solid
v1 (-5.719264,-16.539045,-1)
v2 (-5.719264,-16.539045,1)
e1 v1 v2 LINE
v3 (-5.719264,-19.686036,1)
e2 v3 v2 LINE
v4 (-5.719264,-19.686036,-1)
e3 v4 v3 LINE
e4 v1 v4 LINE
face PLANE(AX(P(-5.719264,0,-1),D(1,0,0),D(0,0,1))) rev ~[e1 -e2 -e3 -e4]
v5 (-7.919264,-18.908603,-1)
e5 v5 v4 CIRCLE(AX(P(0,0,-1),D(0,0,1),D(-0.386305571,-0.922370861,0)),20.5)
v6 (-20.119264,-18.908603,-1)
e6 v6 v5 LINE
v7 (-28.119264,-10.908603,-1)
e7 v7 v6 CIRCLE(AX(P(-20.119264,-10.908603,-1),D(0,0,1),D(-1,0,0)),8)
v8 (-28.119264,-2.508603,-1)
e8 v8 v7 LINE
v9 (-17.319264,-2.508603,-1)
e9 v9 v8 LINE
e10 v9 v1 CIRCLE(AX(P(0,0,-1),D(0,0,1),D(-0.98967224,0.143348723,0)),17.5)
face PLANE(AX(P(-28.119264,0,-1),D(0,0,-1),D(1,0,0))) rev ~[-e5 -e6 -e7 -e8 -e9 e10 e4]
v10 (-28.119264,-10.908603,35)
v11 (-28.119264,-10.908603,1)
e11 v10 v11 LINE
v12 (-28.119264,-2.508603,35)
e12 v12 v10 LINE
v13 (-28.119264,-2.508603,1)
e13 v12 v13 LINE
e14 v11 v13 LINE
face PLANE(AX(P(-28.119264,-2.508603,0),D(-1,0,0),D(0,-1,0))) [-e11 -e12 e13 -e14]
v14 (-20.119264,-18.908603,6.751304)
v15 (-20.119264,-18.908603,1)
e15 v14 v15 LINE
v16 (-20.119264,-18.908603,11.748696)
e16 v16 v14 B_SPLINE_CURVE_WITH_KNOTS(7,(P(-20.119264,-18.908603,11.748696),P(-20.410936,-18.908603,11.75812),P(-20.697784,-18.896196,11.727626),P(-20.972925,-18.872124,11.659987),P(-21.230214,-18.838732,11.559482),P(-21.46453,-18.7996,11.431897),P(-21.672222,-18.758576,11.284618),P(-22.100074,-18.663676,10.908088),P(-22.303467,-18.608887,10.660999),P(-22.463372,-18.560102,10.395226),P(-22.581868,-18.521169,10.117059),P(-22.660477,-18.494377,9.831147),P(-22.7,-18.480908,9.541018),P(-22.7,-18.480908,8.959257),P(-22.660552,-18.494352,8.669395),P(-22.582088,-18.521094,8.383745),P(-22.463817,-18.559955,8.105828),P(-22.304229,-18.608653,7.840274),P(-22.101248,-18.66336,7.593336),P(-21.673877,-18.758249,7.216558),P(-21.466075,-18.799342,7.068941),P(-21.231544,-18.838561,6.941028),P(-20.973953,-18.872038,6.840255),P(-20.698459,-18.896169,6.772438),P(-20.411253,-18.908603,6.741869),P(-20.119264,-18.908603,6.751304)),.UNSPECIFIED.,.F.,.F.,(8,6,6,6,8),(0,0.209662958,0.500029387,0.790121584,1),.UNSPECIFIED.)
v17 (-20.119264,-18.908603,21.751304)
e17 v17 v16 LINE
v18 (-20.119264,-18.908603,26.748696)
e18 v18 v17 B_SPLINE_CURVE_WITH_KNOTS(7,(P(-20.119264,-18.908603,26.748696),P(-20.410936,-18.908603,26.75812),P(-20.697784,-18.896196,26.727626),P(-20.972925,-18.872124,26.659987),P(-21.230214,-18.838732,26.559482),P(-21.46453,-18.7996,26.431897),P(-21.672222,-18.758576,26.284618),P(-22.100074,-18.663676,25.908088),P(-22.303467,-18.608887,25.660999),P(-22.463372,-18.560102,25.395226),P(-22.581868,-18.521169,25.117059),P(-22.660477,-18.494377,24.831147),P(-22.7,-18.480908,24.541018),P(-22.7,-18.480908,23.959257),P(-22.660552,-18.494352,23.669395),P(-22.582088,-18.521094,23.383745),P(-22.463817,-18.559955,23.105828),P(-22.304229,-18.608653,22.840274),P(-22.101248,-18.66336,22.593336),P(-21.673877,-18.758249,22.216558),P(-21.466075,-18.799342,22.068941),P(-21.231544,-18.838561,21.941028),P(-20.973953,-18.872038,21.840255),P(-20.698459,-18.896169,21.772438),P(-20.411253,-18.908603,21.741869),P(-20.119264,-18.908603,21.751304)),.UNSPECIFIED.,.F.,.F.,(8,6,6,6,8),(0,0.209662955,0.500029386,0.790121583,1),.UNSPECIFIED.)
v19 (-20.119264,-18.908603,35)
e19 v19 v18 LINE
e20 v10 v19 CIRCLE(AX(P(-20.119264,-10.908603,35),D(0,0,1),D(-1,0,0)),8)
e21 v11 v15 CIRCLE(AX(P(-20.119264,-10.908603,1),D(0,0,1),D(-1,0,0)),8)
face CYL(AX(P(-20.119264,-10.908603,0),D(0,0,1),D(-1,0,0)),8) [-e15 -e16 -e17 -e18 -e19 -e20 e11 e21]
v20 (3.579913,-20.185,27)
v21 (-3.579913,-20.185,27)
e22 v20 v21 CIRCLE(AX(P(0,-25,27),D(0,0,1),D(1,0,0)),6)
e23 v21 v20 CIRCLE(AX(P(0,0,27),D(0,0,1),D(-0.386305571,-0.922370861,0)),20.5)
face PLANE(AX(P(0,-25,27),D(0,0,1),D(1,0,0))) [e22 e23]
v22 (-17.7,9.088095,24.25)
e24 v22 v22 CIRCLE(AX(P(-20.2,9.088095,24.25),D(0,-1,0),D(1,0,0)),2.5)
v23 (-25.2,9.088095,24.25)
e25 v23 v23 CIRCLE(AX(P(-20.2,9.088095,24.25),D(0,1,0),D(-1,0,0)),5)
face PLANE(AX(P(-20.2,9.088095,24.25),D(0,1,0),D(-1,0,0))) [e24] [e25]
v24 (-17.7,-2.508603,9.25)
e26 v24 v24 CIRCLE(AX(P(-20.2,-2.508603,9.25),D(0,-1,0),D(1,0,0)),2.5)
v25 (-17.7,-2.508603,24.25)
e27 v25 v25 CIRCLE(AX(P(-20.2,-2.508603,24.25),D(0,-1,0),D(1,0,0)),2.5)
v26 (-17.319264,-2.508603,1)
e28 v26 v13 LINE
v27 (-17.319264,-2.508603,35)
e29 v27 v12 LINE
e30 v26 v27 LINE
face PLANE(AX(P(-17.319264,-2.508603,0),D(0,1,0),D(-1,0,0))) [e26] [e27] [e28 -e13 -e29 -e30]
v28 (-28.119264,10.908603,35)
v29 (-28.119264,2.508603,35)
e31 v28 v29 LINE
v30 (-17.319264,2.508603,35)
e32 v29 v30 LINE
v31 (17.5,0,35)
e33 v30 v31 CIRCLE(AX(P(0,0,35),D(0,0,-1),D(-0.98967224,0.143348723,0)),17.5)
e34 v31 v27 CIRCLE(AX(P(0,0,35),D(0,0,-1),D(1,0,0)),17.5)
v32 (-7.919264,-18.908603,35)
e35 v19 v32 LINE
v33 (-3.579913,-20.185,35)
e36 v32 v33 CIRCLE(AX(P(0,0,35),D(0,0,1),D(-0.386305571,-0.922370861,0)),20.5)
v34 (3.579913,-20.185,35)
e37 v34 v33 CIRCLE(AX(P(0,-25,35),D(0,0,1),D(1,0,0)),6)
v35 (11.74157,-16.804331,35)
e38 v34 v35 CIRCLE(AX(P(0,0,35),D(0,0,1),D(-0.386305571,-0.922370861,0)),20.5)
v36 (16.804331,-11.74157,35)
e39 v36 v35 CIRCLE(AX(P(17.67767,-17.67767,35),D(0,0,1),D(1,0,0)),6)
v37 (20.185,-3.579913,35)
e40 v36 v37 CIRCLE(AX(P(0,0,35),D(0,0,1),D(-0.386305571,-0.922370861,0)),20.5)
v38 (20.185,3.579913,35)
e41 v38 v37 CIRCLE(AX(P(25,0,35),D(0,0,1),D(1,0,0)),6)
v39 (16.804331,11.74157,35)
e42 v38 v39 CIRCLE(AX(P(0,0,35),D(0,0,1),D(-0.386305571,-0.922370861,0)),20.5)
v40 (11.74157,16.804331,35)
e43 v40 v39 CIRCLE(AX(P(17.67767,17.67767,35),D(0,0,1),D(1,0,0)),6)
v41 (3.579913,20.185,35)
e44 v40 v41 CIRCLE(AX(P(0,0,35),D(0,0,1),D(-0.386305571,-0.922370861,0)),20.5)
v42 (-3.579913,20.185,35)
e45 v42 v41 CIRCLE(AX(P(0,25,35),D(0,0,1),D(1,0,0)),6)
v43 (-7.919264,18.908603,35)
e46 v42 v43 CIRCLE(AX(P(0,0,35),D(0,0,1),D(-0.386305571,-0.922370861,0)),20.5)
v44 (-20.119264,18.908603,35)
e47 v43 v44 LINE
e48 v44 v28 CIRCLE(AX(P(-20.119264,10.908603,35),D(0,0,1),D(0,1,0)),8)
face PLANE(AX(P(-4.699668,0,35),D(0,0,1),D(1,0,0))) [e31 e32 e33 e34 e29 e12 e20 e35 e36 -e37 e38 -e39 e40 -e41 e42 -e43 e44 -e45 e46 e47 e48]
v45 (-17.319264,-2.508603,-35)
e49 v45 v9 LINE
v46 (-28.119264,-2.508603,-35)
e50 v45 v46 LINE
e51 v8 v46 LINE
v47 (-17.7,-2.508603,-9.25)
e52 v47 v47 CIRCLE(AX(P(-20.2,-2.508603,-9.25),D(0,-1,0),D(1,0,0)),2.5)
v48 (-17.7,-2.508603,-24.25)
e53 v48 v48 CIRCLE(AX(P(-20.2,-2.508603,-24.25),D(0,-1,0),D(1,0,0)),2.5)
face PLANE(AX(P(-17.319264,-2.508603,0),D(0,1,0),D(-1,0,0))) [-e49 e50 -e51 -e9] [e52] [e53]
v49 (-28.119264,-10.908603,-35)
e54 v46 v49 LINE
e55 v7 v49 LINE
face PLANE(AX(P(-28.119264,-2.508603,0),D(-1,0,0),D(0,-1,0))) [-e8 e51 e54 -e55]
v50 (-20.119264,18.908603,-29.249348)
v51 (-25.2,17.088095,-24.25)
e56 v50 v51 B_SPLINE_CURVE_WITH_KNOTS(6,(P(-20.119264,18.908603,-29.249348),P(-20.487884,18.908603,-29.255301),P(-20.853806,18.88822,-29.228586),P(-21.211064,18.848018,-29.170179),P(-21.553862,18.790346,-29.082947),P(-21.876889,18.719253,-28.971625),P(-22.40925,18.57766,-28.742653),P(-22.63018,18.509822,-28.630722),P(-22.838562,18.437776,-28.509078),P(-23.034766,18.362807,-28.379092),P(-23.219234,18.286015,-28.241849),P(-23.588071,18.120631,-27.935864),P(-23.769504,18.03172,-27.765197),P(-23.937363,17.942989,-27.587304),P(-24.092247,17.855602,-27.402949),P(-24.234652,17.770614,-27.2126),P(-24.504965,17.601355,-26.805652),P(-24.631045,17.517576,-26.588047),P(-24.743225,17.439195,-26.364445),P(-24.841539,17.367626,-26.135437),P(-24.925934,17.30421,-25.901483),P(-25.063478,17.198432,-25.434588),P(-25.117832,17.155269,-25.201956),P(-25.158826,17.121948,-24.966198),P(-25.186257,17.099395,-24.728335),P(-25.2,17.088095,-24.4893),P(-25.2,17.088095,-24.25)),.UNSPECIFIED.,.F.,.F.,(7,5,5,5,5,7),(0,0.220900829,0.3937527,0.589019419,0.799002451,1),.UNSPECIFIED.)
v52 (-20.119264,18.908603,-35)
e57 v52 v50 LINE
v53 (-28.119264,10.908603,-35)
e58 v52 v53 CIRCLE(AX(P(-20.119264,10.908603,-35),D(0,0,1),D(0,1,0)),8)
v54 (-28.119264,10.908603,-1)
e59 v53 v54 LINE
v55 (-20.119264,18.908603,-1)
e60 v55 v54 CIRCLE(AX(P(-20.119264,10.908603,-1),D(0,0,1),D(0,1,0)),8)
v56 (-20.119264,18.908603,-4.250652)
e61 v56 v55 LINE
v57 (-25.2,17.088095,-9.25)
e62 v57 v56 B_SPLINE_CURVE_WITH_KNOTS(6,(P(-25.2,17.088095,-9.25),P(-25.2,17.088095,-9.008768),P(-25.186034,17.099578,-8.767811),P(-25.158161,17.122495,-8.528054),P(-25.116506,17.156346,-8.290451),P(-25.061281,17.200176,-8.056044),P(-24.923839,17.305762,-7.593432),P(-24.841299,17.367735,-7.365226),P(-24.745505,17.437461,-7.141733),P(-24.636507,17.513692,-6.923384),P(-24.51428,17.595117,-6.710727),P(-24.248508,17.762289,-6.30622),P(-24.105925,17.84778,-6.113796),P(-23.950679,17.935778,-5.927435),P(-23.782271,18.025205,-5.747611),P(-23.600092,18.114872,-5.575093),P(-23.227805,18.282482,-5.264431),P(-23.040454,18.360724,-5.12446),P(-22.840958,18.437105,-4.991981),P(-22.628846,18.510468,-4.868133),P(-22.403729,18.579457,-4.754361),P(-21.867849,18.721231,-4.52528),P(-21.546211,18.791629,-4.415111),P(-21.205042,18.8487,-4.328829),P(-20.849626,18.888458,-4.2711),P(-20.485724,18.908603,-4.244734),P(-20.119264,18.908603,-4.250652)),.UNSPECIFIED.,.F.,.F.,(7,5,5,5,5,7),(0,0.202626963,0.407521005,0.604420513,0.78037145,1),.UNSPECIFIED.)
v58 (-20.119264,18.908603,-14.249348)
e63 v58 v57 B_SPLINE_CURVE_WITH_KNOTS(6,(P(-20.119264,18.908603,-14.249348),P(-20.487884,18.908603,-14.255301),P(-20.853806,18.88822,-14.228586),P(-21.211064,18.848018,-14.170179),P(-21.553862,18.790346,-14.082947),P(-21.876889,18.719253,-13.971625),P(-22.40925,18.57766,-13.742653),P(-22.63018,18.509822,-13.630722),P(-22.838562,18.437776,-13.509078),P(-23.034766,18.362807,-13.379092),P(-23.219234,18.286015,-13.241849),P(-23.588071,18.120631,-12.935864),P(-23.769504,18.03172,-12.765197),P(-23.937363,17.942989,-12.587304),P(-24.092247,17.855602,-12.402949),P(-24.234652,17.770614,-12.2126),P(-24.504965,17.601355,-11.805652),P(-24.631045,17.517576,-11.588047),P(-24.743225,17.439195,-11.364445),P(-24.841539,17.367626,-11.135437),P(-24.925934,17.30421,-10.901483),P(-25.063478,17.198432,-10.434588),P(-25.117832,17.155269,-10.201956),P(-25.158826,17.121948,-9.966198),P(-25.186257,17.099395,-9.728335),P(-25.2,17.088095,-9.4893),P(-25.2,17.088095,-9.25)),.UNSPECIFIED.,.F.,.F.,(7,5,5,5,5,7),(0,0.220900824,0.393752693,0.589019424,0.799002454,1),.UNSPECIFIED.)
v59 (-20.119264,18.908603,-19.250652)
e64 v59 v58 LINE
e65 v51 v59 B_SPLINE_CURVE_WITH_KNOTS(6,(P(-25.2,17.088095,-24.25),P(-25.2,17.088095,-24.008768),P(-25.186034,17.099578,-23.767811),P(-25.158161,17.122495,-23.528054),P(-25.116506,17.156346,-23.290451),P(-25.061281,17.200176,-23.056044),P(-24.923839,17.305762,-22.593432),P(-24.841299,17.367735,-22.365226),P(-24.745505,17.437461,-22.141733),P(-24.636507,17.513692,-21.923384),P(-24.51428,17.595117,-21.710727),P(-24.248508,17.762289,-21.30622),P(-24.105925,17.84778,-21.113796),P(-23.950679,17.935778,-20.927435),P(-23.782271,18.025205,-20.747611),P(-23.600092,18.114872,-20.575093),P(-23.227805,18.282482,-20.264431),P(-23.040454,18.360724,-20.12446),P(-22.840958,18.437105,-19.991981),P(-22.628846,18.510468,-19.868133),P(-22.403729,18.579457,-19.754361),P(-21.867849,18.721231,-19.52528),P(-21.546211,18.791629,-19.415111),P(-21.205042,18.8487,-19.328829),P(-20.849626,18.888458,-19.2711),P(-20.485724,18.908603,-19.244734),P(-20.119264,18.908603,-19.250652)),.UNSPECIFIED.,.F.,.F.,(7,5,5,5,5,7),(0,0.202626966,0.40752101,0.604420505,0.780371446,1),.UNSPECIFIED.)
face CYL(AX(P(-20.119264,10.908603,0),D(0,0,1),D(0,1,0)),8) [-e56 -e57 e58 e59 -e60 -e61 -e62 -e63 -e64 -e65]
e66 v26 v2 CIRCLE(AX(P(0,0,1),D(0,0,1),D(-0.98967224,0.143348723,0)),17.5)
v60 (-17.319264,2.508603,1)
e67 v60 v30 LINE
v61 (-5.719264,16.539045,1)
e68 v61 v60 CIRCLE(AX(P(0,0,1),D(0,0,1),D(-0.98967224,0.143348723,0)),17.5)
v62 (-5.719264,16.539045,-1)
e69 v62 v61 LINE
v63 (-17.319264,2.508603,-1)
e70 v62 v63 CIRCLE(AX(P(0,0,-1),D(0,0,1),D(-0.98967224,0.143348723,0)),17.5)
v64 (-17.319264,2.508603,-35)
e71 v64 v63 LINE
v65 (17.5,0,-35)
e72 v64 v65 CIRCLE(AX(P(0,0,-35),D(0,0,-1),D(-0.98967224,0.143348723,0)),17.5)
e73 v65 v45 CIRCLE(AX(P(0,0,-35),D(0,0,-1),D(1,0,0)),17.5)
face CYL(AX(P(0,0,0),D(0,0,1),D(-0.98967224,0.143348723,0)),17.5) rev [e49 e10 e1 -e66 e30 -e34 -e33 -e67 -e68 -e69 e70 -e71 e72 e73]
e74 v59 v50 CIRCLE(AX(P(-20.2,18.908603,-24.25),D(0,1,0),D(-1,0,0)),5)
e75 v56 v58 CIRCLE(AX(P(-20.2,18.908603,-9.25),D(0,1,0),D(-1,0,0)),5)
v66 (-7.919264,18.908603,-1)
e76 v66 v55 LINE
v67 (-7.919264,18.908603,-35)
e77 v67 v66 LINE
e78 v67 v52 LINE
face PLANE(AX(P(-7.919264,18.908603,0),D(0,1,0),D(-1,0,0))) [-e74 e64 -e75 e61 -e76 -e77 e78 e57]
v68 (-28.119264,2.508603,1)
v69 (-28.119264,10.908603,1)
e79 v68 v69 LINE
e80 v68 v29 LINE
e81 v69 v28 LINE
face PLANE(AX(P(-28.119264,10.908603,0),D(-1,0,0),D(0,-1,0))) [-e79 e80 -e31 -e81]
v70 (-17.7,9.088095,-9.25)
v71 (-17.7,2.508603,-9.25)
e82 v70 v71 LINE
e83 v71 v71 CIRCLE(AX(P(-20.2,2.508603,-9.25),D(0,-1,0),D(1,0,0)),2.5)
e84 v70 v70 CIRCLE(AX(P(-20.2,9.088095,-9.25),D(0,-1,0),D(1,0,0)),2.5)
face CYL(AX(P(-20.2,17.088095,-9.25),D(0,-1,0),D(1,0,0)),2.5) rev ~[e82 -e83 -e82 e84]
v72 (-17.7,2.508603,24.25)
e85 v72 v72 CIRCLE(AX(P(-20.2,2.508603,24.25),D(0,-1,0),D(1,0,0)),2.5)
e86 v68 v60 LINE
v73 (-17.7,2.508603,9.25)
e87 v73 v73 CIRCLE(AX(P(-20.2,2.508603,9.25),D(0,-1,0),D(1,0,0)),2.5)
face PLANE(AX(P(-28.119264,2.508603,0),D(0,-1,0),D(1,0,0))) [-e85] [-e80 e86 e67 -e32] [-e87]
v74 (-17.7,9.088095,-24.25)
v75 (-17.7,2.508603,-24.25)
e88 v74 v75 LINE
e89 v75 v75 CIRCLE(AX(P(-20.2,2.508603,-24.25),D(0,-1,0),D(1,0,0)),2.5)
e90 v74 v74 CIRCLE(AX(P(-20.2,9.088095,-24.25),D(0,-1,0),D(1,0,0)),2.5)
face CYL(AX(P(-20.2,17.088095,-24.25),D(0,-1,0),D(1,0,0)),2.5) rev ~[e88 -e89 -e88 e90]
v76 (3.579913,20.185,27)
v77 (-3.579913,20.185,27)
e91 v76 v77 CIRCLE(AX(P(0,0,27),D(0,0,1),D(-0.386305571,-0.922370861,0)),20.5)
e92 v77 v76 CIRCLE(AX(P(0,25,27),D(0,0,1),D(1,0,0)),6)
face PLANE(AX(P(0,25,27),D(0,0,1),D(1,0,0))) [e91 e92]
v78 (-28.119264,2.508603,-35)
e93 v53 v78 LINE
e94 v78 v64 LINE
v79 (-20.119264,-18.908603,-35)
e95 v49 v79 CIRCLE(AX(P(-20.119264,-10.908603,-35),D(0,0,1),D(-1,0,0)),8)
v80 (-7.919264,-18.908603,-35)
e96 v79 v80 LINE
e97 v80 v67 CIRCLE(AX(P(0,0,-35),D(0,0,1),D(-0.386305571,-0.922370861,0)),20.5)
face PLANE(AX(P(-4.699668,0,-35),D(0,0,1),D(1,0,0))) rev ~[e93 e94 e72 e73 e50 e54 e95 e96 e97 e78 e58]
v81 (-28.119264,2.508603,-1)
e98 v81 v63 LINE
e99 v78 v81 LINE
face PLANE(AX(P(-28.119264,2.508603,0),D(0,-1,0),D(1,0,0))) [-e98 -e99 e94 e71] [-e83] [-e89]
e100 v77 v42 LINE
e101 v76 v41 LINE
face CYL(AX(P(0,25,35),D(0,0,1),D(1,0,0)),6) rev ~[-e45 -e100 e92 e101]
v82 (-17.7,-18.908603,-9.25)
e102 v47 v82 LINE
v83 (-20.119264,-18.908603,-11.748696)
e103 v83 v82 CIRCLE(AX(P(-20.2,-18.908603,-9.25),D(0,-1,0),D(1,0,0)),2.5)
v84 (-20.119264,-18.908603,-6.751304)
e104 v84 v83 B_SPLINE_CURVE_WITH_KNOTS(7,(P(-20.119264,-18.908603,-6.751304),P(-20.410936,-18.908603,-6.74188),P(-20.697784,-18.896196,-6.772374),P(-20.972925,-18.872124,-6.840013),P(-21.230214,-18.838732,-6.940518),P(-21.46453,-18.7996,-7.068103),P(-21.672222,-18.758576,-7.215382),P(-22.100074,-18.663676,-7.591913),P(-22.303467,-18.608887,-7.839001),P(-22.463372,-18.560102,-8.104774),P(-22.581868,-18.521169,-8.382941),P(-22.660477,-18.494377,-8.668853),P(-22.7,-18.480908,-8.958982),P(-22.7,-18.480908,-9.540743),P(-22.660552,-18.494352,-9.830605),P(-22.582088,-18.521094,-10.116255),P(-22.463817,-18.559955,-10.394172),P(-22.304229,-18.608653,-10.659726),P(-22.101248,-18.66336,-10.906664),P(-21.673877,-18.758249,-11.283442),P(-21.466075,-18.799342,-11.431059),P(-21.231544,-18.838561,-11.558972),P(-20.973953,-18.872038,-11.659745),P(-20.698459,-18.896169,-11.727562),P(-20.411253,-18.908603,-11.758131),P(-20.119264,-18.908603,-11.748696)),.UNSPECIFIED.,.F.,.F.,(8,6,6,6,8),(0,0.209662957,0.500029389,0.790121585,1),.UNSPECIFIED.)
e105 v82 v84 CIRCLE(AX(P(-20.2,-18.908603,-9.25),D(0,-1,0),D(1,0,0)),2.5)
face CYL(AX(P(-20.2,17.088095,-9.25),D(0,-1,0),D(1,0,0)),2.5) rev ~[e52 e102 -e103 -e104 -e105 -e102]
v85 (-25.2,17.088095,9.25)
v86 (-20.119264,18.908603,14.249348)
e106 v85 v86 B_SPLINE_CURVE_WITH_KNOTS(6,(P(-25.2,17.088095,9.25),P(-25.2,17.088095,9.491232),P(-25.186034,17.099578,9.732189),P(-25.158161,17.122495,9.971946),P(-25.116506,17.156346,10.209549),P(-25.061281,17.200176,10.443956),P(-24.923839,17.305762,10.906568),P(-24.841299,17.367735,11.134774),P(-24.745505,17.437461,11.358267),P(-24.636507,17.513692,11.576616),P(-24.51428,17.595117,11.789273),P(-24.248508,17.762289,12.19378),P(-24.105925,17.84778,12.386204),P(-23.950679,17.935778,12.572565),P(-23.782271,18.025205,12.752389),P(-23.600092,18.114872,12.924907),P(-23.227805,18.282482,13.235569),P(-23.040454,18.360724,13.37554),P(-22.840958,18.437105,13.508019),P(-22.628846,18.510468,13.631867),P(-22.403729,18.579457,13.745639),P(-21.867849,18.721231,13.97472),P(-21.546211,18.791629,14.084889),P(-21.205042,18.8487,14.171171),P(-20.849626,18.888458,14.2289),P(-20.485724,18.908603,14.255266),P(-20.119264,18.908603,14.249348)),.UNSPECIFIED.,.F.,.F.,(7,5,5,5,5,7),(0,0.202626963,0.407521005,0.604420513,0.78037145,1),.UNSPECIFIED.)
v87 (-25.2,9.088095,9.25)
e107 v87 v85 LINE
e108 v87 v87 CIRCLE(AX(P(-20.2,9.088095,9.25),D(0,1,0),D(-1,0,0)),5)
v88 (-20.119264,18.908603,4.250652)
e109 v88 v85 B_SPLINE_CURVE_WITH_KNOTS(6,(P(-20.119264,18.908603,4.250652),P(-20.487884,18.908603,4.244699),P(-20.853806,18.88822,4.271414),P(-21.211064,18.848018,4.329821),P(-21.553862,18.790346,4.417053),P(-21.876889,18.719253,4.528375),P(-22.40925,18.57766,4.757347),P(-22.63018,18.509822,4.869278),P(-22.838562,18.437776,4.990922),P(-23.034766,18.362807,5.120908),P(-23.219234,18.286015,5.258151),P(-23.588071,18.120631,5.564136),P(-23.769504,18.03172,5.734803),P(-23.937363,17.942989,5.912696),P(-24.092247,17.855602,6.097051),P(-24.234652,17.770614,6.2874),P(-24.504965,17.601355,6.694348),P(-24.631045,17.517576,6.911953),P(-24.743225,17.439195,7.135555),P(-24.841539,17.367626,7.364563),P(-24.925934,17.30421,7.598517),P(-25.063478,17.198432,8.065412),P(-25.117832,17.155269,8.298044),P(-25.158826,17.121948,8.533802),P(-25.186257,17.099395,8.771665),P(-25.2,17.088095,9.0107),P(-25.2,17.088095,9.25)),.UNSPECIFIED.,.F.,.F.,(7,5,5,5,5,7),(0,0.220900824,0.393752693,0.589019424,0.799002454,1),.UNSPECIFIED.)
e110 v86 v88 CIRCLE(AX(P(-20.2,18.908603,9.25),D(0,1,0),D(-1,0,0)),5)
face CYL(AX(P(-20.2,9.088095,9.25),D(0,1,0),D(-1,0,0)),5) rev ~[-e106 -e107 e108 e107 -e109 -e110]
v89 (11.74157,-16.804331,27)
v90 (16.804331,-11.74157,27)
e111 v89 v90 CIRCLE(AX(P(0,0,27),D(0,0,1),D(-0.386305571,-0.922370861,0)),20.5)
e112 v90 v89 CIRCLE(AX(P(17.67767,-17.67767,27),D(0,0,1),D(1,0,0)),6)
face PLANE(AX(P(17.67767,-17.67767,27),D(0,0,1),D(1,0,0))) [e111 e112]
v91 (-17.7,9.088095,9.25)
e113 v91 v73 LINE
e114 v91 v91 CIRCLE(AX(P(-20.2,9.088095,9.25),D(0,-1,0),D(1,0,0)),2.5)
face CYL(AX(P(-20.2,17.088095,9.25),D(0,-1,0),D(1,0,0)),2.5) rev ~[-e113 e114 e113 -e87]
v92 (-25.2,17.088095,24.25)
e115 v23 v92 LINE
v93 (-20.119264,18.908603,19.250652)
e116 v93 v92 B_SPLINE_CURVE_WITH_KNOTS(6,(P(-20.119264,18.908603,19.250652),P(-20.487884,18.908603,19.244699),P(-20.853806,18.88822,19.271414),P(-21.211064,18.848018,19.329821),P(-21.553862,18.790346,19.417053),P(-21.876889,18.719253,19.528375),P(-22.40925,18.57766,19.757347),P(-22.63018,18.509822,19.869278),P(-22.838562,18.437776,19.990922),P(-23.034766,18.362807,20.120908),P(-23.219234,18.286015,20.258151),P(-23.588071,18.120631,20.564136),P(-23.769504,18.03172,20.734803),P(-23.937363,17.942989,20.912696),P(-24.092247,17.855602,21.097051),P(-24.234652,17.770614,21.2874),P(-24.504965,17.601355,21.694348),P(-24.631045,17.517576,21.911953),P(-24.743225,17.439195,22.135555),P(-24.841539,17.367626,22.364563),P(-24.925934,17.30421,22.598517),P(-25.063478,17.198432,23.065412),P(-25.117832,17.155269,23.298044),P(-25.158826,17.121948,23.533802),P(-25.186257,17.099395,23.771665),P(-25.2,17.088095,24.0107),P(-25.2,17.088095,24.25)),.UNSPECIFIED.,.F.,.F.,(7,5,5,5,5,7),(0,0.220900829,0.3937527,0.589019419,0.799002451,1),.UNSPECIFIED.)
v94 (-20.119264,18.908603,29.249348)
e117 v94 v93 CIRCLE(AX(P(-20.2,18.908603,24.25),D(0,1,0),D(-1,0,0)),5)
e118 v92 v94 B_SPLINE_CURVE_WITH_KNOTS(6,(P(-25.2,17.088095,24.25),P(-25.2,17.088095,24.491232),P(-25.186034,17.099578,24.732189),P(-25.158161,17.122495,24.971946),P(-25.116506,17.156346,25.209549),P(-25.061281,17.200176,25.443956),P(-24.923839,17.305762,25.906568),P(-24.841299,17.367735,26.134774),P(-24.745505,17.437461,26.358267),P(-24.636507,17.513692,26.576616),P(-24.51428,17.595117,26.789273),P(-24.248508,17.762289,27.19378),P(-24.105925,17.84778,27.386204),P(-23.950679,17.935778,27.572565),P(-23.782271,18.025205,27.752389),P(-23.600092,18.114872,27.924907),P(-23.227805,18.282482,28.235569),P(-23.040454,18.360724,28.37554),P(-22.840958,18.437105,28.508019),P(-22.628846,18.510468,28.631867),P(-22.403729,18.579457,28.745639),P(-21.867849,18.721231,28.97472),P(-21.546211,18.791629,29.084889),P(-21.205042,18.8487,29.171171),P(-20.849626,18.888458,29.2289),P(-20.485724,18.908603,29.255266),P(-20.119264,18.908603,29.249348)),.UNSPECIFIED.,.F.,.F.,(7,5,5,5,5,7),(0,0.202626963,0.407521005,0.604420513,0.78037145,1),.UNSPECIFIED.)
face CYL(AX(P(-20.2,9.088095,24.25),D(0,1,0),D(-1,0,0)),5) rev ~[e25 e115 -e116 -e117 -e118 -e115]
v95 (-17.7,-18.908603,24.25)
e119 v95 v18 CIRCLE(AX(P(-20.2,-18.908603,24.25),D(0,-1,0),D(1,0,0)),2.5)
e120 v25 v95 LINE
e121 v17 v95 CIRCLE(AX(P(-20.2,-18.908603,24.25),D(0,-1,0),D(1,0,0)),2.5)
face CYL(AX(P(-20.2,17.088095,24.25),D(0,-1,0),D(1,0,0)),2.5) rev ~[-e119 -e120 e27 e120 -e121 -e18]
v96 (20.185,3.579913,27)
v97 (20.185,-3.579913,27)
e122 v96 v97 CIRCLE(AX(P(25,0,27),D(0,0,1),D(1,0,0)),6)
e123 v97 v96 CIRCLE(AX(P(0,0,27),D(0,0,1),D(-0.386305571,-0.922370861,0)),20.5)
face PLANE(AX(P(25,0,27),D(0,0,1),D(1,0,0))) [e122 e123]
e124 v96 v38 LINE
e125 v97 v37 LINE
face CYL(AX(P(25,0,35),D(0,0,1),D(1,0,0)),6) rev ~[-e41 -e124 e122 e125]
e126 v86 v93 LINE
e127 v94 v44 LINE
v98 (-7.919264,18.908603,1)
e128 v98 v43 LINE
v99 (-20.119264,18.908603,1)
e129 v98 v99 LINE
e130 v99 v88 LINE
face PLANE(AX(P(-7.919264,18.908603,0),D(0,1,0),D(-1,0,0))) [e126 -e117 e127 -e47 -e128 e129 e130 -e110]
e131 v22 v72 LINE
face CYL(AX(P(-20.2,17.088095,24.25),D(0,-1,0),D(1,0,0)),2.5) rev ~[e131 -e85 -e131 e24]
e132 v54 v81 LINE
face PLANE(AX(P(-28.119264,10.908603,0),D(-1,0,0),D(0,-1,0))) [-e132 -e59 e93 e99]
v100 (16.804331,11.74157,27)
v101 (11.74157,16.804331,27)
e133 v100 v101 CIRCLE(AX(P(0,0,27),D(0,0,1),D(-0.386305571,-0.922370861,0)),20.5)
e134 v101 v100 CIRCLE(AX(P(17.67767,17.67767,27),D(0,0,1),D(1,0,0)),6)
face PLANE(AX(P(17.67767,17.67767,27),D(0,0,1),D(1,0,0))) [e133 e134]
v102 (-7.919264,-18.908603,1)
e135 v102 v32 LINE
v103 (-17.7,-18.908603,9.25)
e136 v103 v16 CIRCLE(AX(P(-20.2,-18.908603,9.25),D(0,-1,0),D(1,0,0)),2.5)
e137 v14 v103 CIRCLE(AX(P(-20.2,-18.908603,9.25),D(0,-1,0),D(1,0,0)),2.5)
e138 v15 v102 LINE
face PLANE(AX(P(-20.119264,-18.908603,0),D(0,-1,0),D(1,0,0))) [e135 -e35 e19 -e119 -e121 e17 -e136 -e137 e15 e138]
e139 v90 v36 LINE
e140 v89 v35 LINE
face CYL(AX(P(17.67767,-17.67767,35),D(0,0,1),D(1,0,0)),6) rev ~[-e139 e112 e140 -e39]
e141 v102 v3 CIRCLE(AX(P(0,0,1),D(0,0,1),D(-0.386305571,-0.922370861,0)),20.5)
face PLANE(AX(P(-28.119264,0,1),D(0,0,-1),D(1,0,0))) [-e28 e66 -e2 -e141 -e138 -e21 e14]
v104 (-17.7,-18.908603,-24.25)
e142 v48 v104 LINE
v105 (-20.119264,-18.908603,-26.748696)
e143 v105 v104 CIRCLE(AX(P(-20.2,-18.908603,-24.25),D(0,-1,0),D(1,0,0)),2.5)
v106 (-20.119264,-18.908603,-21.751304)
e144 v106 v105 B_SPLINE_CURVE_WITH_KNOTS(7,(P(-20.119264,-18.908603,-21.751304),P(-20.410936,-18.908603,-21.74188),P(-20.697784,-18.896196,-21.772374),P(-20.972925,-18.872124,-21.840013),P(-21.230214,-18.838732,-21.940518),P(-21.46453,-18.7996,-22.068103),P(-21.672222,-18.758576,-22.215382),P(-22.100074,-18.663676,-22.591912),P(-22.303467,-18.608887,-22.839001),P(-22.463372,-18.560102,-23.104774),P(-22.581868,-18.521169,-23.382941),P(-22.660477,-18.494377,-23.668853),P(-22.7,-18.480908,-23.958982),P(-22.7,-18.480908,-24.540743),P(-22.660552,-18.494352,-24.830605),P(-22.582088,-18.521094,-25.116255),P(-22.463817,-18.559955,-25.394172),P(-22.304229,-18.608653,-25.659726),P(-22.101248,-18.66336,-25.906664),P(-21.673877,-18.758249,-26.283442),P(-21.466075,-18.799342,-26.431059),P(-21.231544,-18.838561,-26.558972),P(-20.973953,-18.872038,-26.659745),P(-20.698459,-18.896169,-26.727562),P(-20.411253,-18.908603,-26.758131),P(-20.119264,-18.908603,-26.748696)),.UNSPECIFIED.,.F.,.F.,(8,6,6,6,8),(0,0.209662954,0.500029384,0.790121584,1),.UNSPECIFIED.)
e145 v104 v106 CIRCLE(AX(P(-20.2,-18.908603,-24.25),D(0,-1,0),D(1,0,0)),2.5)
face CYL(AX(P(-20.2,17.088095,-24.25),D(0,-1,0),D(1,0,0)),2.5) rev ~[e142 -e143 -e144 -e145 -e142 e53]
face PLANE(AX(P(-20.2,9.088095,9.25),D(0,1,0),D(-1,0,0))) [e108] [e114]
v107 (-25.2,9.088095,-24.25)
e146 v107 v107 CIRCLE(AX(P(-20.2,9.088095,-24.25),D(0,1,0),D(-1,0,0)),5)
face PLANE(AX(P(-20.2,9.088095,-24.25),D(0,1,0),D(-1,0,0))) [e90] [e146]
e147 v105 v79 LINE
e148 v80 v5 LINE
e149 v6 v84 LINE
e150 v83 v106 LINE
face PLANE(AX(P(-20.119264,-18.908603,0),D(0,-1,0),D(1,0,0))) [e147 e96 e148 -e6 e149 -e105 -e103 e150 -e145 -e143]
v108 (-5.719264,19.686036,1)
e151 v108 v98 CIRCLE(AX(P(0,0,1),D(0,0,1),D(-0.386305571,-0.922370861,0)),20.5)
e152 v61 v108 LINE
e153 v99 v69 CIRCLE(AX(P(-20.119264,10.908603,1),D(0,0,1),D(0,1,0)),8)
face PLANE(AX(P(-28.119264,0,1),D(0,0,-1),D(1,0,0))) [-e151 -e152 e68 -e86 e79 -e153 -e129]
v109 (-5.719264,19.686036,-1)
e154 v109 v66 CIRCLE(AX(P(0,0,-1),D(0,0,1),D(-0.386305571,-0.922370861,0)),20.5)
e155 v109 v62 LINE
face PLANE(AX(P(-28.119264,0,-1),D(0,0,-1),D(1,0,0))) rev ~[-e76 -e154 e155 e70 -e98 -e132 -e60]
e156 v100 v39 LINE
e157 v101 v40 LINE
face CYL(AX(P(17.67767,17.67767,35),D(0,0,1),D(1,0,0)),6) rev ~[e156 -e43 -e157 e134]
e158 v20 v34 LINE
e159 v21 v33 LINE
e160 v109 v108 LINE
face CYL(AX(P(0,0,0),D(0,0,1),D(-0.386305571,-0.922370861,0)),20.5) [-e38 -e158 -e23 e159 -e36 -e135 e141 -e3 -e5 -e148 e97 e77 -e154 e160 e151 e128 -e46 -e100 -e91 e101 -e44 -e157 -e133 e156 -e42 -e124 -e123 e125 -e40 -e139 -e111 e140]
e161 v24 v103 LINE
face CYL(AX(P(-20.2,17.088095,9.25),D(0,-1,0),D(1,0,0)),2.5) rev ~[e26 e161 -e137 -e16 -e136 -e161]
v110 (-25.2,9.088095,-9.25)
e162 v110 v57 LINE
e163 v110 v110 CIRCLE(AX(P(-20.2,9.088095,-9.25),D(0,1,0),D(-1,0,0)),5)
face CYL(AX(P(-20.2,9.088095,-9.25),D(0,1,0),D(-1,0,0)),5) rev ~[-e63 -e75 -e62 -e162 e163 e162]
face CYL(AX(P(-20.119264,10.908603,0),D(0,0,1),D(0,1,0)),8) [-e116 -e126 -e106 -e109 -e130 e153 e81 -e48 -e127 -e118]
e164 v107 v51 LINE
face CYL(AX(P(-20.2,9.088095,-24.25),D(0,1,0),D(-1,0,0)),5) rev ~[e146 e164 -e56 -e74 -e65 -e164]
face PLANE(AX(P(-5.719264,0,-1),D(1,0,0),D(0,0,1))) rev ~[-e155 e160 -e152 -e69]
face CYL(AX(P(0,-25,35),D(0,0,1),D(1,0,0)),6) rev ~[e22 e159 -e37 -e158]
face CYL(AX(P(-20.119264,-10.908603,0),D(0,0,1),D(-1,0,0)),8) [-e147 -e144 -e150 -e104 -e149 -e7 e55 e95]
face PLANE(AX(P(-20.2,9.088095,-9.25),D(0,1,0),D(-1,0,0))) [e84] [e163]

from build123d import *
from build123d import SkipClean  # not in build123d's __all__

# Parameters (mm, degrees)
F1_DEPTH       = 35
F3_D           = 5
F3_START       = 1.8205079
F3_CBORE_D     = 10
F3_CBORE_DEPTH = 8
F4_W           = 22.4
F4_H           = 2
F5_DEPTH       = 25
F6_R           = 6
F7_DEPTH       = 8


with BuildPart() as f1:
    # F0 (on Top) → F1 (new body, symmetric)
    with BuildSketch(Plane.XY):
        with BuildLine():
            Line((-20.1192642082, -18.9086026559), (-7.9192642082, -18.9086026559))
            ThreePointArc((-7.9192642082, -18.9086026559), (20.5, 0), (-7.9192642082, 18.9086026559))
            Line((-7.9192642082, 18.9086026559), (-20.1192642082, 18.9086026559))
            ThreePointArc((-20.1192642082, 18.9086026559), (-25.7761184577, 16.5654569054), (-28.1192642082, 10.9086026559))
            Line((-28.1192642082, 10.9086026559), (-28.1192642082, 2.5086026559))
            Line((-28.1192642082, 2.5086026559), (-17.3192642082, 2.5086026559))
            ThreePointArc((-17.3192642082, 2.5086026559), (1.2575524553, 17.4547575698), (17.5, 0))
            ThreePointArc((17.5, 0), (1.2575524553, -17.4547575698), (-17.3192642082, -2.5086026559))
            Line((-17.3192642082, -2.5086026559), (-28.1192642082, -2.5086026559))
            Line((-28.1192642082, -2.5086026559), (-28.1192642082, -10.9086026559))
            ThreePointArc((-28.1192642082, -10.9086026559), (-25.7761184577, -16.5654569054), (-20.1192642082, -18.9086026559))
        make_face()
    extrude(amount=F1_DEPTH, both=True)

    # F3 (through all)
    # its depths count from where the whole tool has entered the part; down to there all is cleared
    with Locations(Plane(origin=(0, 18.9086026559, 0), x_dir=(-1, 0, 0), z_dir=(0, 1, 0)).offset(-F3_START)):
        with Locations((20.2, -24.25), (20.2, -9.25), (20.2, 9.25), (20.2, 24.25)):
            CounterBoreHole(F3_D / 2, F3_CBORE_D / 2, F3_CBORE_DEPTH)

    # F4 (on Front) → F5 (cut, symmetric)
    with BuildSketch(Plane.XZ):
        with Locations((-16.9192642082, 0)):
            Rectangle(F4_W, F4_H)
    with SkipClean():  # cleaning this boolean's faces spoils the solid; the shape is the same uncleaned
        extrude(amount=F5_DEPTH, both=True, mode=Mode.SUBTRACT)

    # F6 (on face) → F7 (cut)
    with BuildSketch(Plane.XY.offset(35)):
        with Locations((0, -25)):
            Circle(F6_R)
        with Locations((17.6776695297, -17.6776695297)):
            Circle(F6_R)
        with Locations((25, 0)):
            Circle(F6_R)
        with Locations((17.6776695297, 17.6776695297)):
            Circle(F6_R)
        with Locations((0, 25)):
            Circle(F6_R)
    extrude(amount=-F7_DEPTH, mode=Mode.SUBTRACT)


solid = f1.part
